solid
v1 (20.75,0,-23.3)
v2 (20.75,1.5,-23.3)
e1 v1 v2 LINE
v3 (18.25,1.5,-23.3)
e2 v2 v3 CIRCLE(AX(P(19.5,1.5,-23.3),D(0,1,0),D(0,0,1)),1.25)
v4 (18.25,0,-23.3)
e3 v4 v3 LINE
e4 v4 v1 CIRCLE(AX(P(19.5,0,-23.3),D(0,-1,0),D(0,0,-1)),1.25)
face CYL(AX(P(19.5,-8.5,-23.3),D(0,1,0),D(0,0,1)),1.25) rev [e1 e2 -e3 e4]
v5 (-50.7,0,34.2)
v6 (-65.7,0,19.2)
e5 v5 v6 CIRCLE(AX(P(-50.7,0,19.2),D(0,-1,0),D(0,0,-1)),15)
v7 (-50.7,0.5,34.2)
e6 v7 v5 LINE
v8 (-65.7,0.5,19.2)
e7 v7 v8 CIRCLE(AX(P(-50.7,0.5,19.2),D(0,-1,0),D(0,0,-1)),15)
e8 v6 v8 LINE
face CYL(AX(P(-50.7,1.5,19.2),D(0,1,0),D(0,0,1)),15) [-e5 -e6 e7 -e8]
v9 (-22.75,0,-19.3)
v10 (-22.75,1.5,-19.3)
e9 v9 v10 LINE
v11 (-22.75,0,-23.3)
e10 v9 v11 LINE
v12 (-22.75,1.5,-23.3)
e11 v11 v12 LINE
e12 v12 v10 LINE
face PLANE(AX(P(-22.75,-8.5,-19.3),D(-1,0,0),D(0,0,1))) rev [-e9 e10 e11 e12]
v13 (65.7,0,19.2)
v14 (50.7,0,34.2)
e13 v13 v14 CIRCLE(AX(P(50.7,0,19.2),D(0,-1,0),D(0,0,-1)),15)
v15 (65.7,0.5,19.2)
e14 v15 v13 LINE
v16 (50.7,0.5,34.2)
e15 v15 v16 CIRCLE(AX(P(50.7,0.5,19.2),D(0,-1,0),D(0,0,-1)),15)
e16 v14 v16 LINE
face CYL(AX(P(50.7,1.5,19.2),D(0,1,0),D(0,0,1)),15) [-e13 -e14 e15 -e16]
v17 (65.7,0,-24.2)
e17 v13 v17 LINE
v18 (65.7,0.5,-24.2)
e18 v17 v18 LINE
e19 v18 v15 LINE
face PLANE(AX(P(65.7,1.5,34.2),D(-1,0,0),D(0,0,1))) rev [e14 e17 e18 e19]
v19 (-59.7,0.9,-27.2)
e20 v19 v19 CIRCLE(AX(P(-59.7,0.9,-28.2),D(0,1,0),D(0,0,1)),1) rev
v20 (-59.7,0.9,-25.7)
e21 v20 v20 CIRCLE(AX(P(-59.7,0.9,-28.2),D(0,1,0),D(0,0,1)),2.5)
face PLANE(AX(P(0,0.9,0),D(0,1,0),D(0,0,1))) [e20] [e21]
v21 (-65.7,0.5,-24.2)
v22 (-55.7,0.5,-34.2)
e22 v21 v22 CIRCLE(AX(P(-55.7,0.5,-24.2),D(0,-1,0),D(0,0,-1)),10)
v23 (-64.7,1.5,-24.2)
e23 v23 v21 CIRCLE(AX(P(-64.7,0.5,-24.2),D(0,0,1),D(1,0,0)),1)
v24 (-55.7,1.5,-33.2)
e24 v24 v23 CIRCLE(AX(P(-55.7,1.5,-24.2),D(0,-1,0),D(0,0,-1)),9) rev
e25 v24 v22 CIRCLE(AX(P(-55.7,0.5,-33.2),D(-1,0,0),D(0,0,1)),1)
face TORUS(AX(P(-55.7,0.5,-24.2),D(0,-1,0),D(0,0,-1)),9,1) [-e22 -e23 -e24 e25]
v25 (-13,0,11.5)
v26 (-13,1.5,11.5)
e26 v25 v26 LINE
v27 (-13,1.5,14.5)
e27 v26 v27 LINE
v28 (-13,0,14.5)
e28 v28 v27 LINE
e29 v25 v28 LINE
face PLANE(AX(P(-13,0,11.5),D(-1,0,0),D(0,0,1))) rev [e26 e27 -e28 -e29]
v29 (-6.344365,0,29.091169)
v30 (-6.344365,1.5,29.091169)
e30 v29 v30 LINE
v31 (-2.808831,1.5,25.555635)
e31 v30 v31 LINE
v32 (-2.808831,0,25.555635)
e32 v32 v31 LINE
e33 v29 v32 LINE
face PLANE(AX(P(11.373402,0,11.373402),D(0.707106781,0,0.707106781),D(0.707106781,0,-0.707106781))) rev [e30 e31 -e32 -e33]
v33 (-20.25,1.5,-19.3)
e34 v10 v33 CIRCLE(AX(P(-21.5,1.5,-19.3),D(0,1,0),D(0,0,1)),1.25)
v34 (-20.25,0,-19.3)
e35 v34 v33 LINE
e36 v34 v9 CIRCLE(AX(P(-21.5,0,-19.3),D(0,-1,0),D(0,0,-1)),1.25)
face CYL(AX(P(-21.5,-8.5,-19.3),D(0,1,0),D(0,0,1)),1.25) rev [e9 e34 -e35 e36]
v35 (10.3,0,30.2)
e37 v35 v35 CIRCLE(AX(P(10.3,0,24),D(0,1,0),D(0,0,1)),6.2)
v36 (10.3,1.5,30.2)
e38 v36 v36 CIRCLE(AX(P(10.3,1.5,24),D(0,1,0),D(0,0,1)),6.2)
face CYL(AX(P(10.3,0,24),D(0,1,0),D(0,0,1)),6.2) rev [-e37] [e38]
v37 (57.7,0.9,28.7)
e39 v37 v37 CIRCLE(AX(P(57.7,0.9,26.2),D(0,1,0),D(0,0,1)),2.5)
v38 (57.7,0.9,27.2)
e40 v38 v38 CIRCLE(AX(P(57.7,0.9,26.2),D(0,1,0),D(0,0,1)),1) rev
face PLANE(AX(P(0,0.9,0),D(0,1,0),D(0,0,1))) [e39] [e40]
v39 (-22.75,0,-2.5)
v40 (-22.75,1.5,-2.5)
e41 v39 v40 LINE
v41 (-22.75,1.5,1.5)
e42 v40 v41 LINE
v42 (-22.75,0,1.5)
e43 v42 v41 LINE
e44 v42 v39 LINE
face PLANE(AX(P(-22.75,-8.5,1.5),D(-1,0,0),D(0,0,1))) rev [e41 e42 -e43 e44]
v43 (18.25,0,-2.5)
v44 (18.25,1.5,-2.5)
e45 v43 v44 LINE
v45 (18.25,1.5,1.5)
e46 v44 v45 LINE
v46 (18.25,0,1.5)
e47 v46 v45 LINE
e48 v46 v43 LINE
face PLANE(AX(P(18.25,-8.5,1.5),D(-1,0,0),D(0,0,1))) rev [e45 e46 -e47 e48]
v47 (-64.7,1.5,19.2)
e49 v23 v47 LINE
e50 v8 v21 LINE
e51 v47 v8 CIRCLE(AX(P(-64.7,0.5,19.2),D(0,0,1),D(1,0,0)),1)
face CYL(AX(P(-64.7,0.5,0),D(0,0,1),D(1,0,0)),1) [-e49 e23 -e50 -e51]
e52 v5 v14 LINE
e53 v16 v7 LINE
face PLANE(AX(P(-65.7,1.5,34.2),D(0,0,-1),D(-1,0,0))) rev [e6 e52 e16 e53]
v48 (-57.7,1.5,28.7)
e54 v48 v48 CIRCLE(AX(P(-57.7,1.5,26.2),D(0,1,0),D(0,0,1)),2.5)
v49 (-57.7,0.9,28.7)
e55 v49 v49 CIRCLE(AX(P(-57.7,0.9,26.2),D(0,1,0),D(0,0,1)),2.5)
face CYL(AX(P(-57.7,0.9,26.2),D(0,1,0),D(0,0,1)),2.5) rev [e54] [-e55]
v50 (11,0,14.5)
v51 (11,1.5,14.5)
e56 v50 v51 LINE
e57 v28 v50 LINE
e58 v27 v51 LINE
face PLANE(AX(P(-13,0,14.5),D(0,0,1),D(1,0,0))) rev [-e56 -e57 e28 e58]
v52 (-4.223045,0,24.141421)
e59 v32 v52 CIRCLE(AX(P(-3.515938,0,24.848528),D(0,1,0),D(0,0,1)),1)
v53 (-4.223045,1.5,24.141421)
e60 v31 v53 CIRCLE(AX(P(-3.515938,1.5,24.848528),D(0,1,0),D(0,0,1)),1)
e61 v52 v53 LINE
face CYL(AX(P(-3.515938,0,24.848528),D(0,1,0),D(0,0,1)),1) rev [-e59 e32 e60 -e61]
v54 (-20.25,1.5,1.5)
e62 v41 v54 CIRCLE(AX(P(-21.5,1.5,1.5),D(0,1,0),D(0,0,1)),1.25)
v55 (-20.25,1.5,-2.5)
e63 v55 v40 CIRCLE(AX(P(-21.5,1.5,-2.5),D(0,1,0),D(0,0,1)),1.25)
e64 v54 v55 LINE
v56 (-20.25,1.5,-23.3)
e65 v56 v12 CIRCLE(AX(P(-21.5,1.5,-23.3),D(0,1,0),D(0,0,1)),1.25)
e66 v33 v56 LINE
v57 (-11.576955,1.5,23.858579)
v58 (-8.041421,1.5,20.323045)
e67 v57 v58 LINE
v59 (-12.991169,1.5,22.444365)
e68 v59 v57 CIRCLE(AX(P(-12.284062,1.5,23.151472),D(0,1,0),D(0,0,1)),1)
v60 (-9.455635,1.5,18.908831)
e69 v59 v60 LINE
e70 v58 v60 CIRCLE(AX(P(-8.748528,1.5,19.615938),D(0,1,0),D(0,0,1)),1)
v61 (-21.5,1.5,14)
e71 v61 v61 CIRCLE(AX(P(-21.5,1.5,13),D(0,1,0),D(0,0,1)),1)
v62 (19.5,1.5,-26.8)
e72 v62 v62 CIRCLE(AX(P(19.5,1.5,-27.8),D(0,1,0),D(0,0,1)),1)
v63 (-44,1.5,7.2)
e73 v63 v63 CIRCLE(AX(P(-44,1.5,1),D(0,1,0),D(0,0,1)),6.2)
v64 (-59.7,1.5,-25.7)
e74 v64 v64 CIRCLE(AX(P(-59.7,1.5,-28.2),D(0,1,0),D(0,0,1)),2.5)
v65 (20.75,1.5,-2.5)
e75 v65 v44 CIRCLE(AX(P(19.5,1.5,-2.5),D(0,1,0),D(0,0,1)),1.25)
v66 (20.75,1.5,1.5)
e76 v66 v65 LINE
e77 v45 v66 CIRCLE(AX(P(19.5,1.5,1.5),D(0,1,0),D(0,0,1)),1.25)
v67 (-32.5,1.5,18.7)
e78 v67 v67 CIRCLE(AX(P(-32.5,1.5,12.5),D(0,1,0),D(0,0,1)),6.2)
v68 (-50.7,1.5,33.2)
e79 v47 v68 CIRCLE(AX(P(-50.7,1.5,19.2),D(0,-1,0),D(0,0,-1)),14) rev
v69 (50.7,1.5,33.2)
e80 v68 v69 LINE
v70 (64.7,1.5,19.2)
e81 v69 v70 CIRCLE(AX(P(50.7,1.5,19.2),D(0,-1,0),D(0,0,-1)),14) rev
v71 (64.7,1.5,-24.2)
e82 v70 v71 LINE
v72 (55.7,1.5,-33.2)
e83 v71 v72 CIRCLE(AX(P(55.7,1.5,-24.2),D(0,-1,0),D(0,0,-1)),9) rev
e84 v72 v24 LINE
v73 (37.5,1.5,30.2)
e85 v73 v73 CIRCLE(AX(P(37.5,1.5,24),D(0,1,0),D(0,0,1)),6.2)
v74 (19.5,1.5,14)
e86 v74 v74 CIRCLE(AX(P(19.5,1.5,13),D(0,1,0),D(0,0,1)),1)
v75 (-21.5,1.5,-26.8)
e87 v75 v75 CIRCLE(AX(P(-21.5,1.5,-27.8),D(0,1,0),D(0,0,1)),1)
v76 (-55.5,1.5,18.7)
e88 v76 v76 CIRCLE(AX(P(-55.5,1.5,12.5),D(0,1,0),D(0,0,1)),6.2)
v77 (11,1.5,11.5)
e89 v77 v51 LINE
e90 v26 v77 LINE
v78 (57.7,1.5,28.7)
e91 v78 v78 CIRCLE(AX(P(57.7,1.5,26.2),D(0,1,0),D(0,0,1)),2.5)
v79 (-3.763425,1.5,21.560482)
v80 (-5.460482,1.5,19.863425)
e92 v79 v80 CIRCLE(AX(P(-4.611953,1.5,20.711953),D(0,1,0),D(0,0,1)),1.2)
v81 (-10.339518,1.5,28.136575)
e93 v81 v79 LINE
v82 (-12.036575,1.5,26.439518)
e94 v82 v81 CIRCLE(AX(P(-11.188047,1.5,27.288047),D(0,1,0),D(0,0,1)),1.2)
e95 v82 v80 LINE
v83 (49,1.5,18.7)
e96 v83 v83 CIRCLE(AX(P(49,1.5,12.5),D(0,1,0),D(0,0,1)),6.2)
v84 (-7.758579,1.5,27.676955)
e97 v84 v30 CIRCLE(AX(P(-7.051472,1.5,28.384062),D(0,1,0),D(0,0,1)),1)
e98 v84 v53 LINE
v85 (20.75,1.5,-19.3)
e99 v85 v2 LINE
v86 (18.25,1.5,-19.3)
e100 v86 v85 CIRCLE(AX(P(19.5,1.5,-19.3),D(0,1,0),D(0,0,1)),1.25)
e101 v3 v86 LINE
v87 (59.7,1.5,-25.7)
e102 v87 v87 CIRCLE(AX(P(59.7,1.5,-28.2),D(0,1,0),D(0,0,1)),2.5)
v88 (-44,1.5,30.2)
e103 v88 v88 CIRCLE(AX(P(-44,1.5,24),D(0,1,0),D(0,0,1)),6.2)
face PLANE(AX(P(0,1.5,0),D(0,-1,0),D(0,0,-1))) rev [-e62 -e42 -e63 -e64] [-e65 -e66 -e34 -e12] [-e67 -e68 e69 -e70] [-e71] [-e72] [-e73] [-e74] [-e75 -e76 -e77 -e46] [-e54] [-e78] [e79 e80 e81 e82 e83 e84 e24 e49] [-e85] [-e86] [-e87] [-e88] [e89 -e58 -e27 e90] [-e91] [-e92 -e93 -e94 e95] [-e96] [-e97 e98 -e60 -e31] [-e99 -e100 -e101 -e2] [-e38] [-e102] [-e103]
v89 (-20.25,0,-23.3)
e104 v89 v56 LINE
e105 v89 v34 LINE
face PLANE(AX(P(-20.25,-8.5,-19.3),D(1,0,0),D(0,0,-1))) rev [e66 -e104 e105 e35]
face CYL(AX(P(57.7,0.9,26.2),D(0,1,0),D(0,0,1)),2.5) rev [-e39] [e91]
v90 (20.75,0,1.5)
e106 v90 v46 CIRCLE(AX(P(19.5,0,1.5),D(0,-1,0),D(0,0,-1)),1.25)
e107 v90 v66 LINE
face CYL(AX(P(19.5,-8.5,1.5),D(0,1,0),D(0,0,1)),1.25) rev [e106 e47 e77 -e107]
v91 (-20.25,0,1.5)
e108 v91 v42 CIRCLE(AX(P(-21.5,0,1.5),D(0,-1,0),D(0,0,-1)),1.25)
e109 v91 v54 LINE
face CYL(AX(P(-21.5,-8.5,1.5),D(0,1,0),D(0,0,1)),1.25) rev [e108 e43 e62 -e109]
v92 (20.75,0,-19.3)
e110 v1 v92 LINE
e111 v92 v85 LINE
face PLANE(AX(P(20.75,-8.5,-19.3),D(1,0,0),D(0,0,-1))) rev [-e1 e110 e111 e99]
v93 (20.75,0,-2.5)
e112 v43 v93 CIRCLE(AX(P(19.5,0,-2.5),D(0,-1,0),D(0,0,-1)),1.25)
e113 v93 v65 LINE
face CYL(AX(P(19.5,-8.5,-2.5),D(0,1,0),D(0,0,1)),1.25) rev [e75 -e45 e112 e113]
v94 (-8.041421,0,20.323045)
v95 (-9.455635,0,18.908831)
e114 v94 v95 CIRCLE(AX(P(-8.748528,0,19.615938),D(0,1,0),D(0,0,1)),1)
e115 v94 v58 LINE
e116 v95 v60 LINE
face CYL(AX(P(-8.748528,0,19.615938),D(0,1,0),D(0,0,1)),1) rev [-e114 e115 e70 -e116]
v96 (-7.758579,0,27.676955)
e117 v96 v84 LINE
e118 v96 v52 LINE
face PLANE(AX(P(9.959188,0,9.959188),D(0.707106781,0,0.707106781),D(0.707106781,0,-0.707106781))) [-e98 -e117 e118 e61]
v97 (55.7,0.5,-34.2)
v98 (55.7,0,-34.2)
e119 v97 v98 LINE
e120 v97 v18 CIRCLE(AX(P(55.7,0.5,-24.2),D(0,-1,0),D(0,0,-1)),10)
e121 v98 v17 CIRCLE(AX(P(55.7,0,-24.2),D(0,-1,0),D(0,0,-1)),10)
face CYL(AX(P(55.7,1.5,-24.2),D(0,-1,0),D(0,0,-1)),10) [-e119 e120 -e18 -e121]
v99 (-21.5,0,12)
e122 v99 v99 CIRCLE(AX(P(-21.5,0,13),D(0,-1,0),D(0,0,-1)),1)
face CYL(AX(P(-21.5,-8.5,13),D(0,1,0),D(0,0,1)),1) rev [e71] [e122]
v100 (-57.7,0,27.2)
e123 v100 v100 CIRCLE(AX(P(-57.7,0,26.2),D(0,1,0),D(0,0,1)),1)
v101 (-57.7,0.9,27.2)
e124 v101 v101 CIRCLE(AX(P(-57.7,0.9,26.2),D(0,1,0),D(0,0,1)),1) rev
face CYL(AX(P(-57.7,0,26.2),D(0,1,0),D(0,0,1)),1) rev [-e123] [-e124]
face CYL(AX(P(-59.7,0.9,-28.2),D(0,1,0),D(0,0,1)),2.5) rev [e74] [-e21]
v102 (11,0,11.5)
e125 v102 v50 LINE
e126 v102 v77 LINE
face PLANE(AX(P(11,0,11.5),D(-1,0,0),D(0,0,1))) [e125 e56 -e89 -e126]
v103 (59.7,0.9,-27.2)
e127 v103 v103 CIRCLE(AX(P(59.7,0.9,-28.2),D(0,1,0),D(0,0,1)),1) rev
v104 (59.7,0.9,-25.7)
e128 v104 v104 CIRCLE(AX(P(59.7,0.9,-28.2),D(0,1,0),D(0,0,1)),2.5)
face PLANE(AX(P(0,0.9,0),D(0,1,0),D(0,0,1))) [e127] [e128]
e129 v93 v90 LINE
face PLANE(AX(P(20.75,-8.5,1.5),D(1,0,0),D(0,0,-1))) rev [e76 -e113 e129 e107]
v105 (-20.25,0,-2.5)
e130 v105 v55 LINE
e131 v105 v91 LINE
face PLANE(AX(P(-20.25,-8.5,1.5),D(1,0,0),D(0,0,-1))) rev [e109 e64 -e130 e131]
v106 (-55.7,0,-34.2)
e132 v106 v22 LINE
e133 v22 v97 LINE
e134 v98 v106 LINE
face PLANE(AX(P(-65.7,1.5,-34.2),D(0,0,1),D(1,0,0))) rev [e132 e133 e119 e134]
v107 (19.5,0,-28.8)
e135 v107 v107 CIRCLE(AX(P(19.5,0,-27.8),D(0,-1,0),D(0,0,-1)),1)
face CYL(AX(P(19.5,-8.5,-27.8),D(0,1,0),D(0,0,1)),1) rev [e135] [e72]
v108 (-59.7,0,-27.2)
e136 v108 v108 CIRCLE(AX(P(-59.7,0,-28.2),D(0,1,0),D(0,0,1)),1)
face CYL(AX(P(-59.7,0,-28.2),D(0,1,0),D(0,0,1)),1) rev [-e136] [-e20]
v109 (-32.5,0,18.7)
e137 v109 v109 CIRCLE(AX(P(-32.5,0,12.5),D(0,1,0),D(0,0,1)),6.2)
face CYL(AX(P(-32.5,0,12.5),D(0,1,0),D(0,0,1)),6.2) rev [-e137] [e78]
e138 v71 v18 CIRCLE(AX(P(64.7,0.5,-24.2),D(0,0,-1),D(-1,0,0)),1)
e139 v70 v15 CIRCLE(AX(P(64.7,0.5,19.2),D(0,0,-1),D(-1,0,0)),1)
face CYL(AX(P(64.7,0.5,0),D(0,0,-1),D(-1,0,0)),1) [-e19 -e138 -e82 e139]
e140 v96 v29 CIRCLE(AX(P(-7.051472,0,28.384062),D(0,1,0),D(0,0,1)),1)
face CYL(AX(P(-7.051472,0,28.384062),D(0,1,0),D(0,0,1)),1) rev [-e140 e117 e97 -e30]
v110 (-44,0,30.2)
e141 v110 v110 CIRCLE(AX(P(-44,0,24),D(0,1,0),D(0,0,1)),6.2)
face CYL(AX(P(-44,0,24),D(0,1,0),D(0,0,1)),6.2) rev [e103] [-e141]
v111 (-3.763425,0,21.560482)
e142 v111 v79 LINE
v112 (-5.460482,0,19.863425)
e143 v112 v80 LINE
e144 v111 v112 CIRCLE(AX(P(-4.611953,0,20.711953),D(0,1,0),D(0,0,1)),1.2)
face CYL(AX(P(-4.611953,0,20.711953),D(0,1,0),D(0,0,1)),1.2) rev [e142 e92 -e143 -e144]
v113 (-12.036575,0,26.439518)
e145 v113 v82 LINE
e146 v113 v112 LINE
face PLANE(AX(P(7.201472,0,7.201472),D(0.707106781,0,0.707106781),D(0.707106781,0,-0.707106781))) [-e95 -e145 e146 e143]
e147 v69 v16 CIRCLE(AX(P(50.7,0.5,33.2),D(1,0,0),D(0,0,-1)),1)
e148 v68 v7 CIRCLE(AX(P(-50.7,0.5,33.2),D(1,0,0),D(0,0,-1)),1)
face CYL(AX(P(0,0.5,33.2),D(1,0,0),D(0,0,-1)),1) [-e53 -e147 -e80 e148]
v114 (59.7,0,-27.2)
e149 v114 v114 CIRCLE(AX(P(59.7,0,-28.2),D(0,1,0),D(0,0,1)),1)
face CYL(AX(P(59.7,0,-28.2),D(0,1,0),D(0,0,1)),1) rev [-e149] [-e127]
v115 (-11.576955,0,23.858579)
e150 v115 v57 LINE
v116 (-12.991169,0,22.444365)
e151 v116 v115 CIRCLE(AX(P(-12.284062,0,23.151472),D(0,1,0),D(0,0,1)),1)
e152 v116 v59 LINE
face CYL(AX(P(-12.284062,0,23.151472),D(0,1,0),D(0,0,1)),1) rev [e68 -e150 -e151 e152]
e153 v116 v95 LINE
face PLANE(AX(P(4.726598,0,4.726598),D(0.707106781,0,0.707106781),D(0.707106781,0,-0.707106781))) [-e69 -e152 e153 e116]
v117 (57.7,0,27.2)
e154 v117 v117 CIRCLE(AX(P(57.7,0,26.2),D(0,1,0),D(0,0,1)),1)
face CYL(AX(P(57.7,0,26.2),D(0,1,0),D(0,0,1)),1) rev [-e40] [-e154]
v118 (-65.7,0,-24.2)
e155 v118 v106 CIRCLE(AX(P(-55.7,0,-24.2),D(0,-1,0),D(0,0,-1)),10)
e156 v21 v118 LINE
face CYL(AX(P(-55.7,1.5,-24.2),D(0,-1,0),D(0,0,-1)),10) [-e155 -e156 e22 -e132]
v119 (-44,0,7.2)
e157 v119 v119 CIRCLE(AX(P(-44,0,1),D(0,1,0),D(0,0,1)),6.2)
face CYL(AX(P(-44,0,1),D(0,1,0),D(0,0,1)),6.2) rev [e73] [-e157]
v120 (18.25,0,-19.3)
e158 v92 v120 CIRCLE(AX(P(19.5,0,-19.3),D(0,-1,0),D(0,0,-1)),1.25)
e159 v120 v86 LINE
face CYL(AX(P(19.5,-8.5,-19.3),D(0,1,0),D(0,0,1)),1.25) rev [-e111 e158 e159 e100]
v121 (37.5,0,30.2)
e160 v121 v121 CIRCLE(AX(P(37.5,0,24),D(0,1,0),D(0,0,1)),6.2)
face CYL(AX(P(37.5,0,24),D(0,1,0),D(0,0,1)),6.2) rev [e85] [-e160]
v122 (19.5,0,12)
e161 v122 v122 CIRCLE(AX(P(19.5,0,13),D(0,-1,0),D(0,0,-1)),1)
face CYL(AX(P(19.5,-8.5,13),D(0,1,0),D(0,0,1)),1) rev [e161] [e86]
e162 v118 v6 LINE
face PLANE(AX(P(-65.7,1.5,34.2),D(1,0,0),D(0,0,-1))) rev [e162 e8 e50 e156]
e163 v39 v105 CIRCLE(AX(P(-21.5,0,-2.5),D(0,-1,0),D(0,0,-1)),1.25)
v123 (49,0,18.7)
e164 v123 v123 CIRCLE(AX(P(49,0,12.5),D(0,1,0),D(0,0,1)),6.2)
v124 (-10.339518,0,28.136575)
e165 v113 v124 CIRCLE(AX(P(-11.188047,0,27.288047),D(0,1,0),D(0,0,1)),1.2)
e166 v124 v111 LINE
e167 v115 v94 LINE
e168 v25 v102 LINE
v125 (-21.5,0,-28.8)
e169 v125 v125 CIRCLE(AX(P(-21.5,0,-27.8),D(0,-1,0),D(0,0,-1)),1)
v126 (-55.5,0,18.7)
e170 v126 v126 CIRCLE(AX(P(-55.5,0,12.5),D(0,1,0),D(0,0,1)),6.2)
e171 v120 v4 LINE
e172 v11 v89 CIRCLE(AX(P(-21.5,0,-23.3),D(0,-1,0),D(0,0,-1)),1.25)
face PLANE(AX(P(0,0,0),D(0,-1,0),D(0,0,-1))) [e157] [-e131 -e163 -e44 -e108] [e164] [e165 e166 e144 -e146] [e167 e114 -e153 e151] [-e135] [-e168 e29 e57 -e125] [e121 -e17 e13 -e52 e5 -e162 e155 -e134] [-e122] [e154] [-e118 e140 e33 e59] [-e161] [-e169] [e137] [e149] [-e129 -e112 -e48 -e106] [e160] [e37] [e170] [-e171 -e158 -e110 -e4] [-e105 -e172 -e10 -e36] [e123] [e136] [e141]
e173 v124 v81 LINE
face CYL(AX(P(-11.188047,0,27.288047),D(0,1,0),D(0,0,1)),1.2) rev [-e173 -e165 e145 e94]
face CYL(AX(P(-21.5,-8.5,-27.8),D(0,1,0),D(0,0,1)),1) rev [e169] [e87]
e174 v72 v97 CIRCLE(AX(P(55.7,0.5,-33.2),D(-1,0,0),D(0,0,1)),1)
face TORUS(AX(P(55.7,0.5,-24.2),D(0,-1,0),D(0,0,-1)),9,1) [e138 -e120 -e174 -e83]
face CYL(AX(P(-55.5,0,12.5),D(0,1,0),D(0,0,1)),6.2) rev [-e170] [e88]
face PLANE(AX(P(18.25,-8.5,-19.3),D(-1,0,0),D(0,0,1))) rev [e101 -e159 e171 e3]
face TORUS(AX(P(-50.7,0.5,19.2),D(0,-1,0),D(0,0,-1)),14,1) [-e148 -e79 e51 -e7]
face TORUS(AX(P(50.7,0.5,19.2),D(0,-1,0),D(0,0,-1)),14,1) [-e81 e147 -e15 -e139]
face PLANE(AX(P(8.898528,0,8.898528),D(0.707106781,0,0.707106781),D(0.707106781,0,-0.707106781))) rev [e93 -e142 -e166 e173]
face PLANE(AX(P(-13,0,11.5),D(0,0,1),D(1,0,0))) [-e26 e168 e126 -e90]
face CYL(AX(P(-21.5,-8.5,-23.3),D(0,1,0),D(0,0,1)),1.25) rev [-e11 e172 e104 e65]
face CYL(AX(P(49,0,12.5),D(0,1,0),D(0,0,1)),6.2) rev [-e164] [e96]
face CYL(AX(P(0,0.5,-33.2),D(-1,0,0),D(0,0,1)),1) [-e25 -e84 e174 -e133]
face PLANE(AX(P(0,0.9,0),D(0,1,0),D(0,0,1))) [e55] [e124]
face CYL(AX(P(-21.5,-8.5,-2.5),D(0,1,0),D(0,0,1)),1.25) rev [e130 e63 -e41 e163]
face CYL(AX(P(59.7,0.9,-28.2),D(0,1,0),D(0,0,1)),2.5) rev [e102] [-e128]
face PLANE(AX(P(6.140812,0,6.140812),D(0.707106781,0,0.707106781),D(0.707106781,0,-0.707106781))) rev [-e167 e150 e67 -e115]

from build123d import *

# Parameters (mm, degrees)
ESBO_O1_W                          = 131.4
ESBO_O1_H                          = 68.4
BASE_DEPTH                         = 1.5
FILETE1_R                          = 10
FILETE2_R                          = 10
FILETE3_R                          = 15
FILETE4_R                          = 15
ESBO_O2_R                          = 6.2
FURO_DOS_BOT_ES_DEPTH              = 75.083601424
DISPLAY_START                      = -1.5
DISPLAY_OUTLINE_W                  = 24
DISPLAY_OUTLINE_H                  = 3
DISPLAY_DEPTH                      = 1.5
FILETE5_R                          = 1
FURO_BUZZER_DEPTH                  = 75.083601424
ESBO_O5_R                          = 1
FURO_DOS_PARAFUSOS_DEPTH           = 75.083601424
ESBO_O6_R                          = 2.5
FURO_DA_CABE_A_DOS_PARAFUSOS_DEPTH = 0.6
ESBO_O7_R                          = 1
FURO_ADICIONAIS_DO_DISPLAY_DEPTH   = 10


# Read off the part's stored shape, not the designer's step: Display
with BuildPart() as part:
    # Esboço1 → Base (new body)
    with BuildSketch(Plane(origin=(0, 0, 0), x_dir=(1, 0, 0), z_dir=(0, 1, 0))):
        Rectangle(ESBO_O1_W, ESBO_O1_H)
    extrude(amount=BASE_DEPTH)

    # Filete1
    filete1_edges = [part.edges().sort_by_distance(p)[0] for p in [
        (65.7, 0.75, -34.2),
    ]]
    fillet(filete1_edges, radius=FILETE1_R)

    # Filete2
    filete2_edges = [part.edges().sort_by_distance(p)[0] for p in [
        (-65.7, 0.75, -34.2),
    ]]
    fillet(filete2_edges, radius=FILETE2_R)

    # Filete3
    filete3_edges = [part.edges().sort_by_distance(p)[0] for p in [
        (-65.7, 0.75, 34.2),
    ]]
    fillet(filete3_edges, radius=FILETE3_R)

    # Filete4
    filete4_edges = [part.edges().sort_by_distance(p)[0] for p in [
        (65.7, 0.75, 34.2),
    ]]
    fillet(filete4_edges, radius=FILETE4_R)

    # Esboço2 → Furo dos botões (cut, through all)
    with BuildSketch(Plane(origin=(0, 1.5, 0), x_dir=(1, 0, 0), z_dir=(0, 1, 0))):
        with Locations(Location((-44, -1, 0), (0, 0, 270))):
            Circle(ESBO_O2_R)
        with Locations(Location((-32.5, -12.5, 0), (0, 0, 270))):
            Circle(ESBO_O2_R)
        with Locations(Location((-55.5, -12.5, 0), (0, 0, 270))):
            Circle(ESBO_O2_R)
        with Locations(Location((-44, -24, 0), (0, 0, 270))):
            Circle(ESBO_O2_R)
        with Locations(Location((37.5, -24, 0), (0, 0, 270))):
            Circle(ESBO_O2_R)
        with Locations(Location((49, -12.5, 0), (0, 0, 270))):
            Circle(ESBO_O2_R)
        with Locations(Location((10.3, -24, 0), (0, 0, 270))):
            Circle(ESBO_O2_R)
    extrude(amount=-FURO_DOS_BOT_ES_DEPTH, mode=Mode.SUBTRACT)

    # Display outline → Display (cut)
    with BuildSketch(Plane(origin=(0, 1.5, 0), x_dir=(1, 0, 0), z_dir=(0, 1, 0)).offset(DISPLAY_START)):
        with Locations((-1, -13)):
            Rectangle(DISPLAY_OUTLINE_W, DISPLAY_OUTLINE_H)
    extrude(amount=DISPLAY_DEPTH, mode=Mode.SUBTRACT)

    # Filete5
    filete5_edges = [part.edges().sort_by_distance(p)[0] for p in [
        (0, 1.5, -34.2),
        (62.771067812, 1.5, -31.271067812),
        (-65.7, 1.5, -2.5),
        (-62.771067812, 1.5, -31.271067812),
        (0, 1.5, 34.2),
        (-61.306601718, 1.5, 29.806601718),
        (65.7, 1.5, -2.5),
        (61.306601718, 1.5, 29.806601718),
    ]]
    fillet(filete5_edges, radius=FILETE5_R)

    # Esboço4 → Furo buzzer (cut, through all)
    with BuildSketch(Plane(origin=(0, 1.5, 0), x_dir=(1, 0, 0), z_dir=(0, 1, 0))):
        with BuildLine():
            Line((-11.223401872, -20.676598128), (-9.809188309, -22.090811691))
            Line((-9.809188309, -22.090811691), (-8.041421356, -20.323044738))
            ThreePointArc((-8.041421356, -20.323044738), (-8.041421356, -18.908831175), (-9.455634919, -18.908831175))
            Line((-9.455634919, -18.908831175), (-11.223401872, -20.676598128))
        make_face()
        with BuildLine():
            Line((-11.576955262, -23.858578644), (-9.809188309, -22.090811691))
            Line((-9.809188309, -22.090811691), (-11.223401872, -20.676598128))
            Line((-11.223401872, -20.676598128), (-12.991168825, -22.444365081))
            ThreePointArc((-12.991168825, -22.444365081), (-12.991168825, -23.858578644), (-11.576955262, -23.858578644))
        make_face()
        with BuildLine():
            Line((-5.460481605, -19.86342533), (-8.748528137, -23.151471863))
            Line((-8.748528137, -23.151471863), (-7.051471863, -24.848528137))
            Line((-7.051471863, -24.848528137), (-3.76342533, -21.560481605))
            ThreePointArc((-3.76342533, -21.560481605), (-3.76342533, -19.86342533), (-5.460481605, -19.86342533))
        make_face()
        with BuildLine():
            Line((-8.748528137, -23.151471863), (-12.03657467, -26.439518395))
            ThreePointArc((-12.03657467, -26.439518395), (-12.03657467, -28.13657467), (-10.339518395, -28.13657467))
            Line((-10.339518395, -28.13657467), (-7.051471863, -24.848528137))
            Line((-7.051471863, -24.848528137), (-8.748528137, -23.151471863))
        make_face()
        with BuildLine():
            Line((-4.576598128, -27.323401872), (-5.990811691, -25.909188309))
            Line((-5.990811691, -25.909188309), (-7.758578644, -27.676955262))
            ThreePointArc((-7.758578644, -27.676955262), (-7.758578644, -29.091168825), (-6.344365081, -29.091168825))
            Line((-6.344365081, -29.091168825), (-4.576598128, -27.323401872))
        make_face()
        with BuildLine():
            Line((-4.223044738, -24.141421356), (-5.990811691, -25.909188309))
            Line((-5.990811691, -25.909188309), (-4.576598128, -27.323401872))
            Line((-4.576598128, -27.323401872), (-2.808831175, -25.555634919))
            ThreePointArc((-2.808831175, -25.555634919), (-2.808831175, -24.141421356), (-4.223044738, -24.141421356))
        make_face()
    extrude(amount=-FURO_BUZZER_DEPTH, mode=Mode.SUBTRACT)

    # Esboço5 → Furo dos parafusos (cut, through all)
    with BuildSketch(Plane(origin=(0, 1.5, 0), x_dir=(1, 0, 0), z_dir=(0, 1, 0))):
        with Locations(Location((59.7, 28.2, 0), (0, 0, 270))):
            Circle(ESBO_O5_R)
        with Locations(Location((57.7, -26.2, 0), (0, 0, 270))):
            Circle(ESBO_O5_R)
        with Locations(Location((-57.7, -26.2, 0), (0, 0, 270))):
            Circle(ESBO_O5_R)
        with Locations(Location((-59.7, 28.2, 0), (0, 0, 270))):
            Circle(ESBO_O5_R)
    extrude(amount=-FURO_DOS_PARAFUSOS_DEPTH, mode=Mode.SUBTRACT)

    # Esboço6 → Furo da cabeça dos parafusos (cut)
    with BuildSketch(Plane(origin=(0, 1.5, 0), x_dir=(1, 0, 0), z_dir=(0, 1, 0))):
        with Locations(Location((-59.7, 28.2, 0), (0, 0, 270))):
            Circle(ESBO_O6_R)
        with Locations(Location((59.7, 28.2, 0), (0, 0, 270))):
            Circle(ESBO_O6_R)
        with Locations(Location((57.7, -26.2, 0), (0, 0, 270))):
            Circle(ESBO_O6_R)
        with Locations(Location((-57.7, -26.2, 0), (0, 0, 270))):
            Circle(ESBO_O6_R)
    extrude(amount=-FURO_DA_CABE_A_DOS_PARAFUSOS_DEPTH, mode=Mode.SUBTRACT)

    # Esboço7 → Furo adicionais do display (cut)
    with BuildSketch(Plane(origin=(0, 1.5, 0), x_dir=(1, 0, 0), z_dir=(0, 1, 0))):
        with Locations(Location((-21.5, -13, 0), (0, 0, 270))):
            Circle(ESBO_O7_R)
        with Locations(Location((19.5, -13, 0), (0, 0, 270))):
            Circle(ESBO_O7_R)
        with Locations(Location((-21.5, 27.8, 0), (0, 0, 270))):
            Circle(ESBO_O7_R)
        with Locations(Location((19.5, 27.8, 0), (0, 0, 270))):
            Circle(ESBO_O7_R)
        with BuildLine():
            Line((-22.75, -1.5), (-22.75, 2.5))
            ThreePointArc((-22.75, 2.5), (-21.5, 3.75), (-20.25, 2.5))
            Line((-20.25, 2.5), (-20.25, -1.5))
            ThreePointArc((-20.25, -1.5), (-21.5, -2.75), (-22.75, -1.5))
        make_face()
        with BuildLine():
            Line((-22.75, 19.3), (-22.75, 23.3))
            ThreePointArc((-22.75, 23.3), (-21.5, 24.55), (-20.25, 23.3))
            Line((-20.25, 23.3), (-20.25, 19.3))
            ThreePointArc((-20.25, 19.3), (-21.5, 18.05), (-22.75, 19.3))
        make_face()
        with BuildLine():
            Line((18.25, 19.3), (18.25, 23.3))
            ThreePointArc((18.25, 23.3), (19.5, 24.55), (20.75, 23.3))
            Line((20.75, 23.3), (20.75, 19.3))
            ThreePointArc((20.75, 19.3), (19.5, 18.05), (18.25, 19.3))
        make_face()
        with BuildLine():
            Line((18.25, -1.5), (18.25, 2.5))
            ThreePointArc((18.25, 2.5), (19.5, 3.75), (20.75, 2.5))
            Line((20.75, 2.5), (20.75, -1.5))
            ThreePointArc((20.75, -1.5), (19.5, -2.75), (18.25, -1.5))
        make_face()
    extrude(amount=-FURO_ADICIONAIS_DO_DISPLAY_DEPTH, mode=Mode.SUBTRACT)


solid = part.part
